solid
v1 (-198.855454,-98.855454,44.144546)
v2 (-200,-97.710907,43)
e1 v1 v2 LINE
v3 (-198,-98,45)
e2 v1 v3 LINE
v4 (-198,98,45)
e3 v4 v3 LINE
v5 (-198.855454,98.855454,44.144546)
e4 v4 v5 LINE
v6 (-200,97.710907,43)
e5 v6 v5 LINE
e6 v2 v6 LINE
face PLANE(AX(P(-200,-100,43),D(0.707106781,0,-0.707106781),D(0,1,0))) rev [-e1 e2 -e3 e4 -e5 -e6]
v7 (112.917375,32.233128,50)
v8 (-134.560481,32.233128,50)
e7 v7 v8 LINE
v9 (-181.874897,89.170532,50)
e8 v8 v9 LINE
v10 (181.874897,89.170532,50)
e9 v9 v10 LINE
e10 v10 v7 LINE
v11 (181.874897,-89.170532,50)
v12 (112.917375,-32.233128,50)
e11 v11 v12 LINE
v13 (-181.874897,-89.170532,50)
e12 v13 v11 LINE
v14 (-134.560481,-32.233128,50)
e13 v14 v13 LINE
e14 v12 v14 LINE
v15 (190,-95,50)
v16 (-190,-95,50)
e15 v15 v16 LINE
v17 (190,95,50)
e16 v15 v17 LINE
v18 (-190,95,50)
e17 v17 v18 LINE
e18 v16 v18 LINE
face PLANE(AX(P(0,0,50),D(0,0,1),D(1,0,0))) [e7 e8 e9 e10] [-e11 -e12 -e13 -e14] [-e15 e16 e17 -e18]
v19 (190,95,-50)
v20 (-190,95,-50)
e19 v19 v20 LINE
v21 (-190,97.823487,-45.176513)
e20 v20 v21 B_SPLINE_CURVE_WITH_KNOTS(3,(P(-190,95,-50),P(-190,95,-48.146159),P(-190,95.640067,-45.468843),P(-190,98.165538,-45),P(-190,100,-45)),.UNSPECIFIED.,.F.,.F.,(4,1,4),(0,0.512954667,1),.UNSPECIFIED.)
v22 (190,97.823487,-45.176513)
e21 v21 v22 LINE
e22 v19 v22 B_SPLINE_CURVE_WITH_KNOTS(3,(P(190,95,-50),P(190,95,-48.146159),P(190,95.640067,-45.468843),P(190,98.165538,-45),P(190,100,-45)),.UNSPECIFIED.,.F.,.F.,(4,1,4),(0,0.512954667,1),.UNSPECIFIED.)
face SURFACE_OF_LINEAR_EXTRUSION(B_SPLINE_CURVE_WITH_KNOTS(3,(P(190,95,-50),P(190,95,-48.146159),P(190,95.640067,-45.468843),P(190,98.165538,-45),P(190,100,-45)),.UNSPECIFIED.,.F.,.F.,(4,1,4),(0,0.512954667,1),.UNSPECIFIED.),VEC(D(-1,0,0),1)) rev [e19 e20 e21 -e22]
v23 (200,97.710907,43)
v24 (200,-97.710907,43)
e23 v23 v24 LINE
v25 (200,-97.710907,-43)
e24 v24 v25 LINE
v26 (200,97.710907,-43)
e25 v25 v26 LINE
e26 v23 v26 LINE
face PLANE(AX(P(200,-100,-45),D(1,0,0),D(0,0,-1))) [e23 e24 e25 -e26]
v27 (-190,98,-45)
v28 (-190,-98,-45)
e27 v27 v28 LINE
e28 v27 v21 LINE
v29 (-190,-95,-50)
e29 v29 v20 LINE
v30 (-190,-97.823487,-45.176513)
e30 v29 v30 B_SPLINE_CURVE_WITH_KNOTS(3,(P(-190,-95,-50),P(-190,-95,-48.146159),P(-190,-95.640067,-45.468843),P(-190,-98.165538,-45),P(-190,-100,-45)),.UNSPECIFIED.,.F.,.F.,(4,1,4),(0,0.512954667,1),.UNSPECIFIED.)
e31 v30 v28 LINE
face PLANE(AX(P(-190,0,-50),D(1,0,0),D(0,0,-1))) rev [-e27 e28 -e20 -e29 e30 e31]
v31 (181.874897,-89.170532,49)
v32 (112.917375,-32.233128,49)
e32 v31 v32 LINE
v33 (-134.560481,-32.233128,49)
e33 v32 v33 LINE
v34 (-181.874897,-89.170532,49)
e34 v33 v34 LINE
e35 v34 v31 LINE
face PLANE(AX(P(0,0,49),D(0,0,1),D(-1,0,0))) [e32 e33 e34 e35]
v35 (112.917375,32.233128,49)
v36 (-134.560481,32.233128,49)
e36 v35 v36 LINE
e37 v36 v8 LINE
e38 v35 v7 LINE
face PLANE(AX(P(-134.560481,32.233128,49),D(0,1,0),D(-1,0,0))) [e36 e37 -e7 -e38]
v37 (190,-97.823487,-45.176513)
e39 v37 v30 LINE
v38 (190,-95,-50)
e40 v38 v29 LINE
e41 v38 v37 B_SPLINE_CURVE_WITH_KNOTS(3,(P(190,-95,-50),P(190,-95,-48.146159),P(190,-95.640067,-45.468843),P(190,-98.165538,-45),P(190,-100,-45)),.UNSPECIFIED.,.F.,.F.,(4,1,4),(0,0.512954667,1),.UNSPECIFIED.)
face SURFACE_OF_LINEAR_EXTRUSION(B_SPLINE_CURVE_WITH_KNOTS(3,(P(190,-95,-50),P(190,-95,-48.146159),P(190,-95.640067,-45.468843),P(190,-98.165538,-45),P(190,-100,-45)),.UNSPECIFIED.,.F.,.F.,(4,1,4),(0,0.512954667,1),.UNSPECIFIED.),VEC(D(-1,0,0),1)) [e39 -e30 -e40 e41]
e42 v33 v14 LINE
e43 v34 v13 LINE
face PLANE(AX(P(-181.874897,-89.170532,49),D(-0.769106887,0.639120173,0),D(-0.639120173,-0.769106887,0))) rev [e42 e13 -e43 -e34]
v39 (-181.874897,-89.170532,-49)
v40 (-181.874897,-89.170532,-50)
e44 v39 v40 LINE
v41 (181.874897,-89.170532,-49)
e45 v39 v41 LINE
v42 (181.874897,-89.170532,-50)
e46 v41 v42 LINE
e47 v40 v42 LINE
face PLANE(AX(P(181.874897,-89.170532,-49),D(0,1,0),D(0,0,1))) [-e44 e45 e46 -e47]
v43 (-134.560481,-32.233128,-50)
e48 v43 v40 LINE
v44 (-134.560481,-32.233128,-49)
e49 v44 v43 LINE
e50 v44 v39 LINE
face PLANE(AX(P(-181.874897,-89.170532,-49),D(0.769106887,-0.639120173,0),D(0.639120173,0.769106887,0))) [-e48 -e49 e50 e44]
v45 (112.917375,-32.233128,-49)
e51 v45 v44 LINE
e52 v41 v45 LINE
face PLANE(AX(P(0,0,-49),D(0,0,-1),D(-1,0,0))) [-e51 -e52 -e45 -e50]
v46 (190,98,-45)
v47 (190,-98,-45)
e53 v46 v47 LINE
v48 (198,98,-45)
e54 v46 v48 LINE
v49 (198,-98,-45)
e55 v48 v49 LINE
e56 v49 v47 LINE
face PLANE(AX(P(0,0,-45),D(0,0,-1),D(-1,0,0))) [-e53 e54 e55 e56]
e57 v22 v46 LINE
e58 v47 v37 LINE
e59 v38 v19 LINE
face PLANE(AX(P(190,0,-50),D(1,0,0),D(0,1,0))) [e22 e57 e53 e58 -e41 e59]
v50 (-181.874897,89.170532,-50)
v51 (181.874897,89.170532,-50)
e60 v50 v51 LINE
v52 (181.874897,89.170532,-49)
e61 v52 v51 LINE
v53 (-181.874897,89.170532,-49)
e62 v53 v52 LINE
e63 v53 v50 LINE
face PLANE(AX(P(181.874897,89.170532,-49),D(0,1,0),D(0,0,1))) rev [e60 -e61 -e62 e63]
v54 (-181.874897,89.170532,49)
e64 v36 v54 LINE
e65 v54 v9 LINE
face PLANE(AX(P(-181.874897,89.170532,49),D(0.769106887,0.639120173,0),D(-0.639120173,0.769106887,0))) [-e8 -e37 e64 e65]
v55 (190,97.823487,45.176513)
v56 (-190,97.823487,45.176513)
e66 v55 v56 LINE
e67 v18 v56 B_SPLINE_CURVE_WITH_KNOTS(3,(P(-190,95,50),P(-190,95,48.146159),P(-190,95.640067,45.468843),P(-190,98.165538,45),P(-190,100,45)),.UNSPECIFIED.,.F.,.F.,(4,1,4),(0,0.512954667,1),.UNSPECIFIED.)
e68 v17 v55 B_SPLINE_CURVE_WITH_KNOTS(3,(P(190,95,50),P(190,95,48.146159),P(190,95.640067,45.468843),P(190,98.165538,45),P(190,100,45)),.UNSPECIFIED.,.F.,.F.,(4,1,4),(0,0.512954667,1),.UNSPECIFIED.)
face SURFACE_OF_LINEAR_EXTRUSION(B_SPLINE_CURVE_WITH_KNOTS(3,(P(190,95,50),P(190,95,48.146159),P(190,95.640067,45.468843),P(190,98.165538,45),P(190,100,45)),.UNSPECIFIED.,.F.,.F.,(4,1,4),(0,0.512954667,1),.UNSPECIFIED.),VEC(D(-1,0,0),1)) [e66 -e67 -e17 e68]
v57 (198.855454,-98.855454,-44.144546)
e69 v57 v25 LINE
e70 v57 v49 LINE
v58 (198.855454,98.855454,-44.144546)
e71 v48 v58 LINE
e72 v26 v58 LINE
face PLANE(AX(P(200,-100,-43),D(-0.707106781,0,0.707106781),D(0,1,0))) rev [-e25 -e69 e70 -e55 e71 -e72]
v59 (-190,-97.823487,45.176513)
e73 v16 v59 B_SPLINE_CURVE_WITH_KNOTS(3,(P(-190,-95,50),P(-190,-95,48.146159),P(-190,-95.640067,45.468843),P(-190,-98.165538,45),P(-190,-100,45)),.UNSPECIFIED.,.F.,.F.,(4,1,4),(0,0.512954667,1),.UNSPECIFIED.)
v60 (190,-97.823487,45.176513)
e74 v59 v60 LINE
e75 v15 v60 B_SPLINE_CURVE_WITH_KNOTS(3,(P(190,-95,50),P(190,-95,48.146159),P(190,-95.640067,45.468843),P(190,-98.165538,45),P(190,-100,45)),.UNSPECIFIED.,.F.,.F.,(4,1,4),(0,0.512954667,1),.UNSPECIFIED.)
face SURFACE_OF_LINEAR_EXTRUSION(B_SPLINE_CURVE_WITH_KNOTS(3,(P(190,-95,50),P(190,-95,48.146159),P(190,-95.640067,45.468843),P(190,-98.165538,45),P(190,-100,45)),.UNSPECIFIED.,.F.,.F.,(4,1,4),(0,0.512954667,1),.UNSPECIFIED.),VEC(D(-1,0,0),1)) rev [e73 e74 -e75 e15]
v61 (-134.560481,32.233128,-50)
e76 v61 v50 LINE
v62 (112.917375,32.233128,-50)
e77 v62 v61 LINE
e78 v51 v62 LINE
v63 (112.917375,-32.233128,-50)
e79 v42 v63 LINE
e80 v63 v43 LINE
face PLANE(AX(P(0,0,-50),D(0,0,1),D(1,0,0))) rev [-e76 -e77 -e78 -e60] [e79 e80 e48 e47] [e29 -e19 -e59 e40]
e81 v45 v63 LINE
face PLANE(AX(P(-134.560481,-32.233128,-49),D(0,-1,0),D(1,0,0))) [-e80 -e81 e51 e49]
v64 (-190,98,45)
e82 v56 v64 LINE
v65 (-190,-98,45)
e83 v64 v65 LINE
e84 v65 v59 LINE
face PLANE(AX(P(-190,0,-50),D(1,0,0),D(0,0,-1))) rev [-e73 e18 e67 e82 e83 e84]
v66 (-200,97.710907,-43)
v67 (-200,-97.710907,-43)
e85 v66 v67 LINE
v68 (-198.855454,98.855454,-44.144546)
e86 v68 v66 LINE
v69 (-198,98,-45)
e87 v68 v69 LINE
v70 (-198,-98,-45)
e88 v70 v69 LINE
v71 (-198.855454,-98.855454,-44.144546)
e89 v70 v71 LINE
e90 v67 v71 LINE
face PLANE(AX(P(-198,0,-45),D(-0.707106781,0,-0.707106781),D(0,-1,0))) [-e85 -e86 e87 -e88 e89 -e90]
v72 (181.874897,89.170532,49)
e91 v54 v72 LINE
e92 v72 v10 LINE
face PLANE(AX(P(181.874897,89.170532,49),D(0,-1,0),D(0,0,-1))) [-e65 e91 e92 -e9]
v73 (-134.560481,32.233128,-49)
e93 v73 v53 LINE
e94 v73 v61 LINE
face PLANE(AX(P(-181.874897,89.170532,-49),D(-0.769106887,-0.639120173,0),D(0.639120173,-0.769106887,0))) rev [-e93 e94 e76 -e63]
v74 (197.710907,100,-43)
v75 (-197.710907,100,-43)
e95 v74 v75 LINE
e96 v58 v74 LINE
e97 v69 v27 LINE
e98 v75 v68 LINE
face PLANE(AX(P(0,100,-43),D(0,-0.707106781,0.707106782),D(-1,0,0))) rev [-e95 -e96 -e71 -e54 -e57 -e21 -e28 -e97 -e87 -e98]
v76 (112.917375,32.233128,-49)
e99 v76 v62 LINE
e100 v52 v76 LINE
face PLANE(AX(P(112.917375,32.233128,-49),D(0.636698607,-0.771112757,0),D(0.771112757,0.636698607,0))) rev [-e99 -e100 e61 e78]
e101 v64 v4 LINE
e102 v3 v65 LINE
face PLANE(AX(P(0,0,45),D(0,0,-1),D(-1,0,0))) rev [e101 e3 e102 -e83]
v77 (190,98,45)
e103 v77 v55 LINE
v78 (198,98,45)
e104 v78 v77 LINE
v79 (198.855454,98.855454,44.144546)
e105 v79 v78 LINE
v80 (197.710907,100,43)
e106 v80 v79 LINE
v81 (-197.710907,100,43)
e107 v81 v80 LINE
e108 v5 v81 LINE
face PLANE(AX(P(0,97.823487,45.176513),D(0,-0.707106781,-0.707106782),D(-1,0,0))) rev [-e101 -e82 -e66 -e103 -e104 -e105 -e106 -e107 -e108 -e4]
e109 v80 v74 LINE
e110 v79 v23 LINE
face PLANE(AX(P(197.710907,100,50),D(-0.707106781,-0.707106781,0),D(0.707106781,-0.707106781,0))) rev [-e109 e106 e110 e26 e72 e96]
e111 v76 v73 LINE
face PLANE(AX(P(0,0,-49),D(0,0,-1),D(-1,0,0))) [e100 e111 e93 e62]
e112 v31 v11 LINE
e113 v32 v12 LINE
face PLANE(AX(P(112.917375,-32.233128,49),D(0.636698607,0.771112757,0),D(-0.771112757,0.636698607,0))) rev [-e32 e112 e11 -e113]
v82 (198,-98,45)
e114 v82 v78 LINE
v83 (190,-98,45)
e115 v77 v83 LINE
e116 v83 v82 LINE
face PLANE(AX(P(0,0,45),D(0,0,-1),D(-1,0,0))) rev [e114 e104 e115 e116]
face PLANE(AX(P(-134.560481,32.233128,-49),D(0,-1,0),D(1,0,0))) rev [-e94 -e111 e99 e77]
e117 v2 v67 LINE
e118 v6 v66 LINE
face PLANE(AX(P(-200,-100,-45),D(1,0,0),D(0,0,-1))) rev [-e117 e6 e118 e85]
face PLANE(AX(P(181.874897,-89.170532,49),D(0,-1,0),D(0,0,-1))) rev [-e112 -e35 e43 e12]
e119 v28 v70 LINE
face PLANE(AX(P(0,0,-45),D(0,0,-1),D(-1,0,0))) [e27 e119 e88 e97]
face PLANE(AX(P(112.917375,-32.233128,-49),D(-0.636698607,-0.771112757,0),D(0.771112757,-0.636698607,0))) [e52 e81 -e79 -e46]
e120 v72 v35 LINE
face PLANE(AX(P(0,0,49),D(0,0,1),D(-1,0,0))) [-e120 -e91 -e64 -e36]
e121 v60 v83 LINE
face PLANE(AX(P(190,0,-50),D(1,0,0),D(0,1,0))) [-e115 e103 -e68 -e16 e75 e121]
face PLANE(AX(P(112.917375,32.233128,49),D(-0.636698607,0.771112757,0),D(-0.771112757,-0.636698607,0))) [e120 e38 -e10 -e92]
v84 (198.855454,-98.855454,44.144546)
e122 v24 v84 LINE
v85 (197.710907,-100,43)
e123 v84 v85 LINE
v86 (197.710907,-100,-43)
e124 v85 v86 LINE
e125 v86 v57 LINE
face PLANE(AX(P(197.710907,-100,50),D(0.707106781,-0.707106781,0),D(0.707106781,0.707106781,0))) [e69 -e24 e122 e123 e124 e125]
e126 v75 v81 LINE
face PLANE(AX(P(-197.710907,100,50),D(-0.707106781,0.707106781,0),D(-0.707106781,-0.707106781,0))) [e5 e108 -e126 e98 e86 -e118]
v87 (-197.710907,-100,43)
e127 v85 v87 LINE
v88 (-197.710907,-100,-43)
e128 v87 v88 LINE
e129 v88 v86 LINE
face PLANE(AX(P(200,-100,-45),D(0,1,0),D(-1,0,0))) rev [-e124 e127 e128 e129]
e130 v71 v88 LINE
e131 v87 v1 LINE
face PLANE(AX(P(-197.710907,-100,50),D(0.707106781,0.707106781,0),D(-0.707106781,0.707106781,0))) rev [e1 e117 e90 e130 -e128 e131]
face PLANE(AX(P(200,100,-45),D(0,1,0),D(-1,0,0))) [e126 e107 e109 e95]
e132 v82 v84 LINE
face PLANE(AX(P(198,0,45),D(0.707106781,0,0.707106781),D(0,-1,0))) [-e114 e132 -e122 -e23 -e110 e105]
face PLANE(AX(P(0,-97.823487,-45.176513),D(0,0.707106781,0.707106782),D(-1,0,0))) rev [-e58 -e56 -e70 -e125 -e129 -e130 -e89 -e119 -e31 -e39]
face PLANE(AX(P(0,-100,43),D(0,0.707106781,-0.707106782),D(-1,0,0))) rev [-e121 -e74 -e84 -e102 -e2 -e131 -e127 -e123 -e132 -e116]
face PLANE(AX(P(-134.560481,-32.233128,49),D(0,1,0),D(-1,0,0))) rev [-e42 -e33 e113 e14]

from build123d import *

# Parameters (mm, degrees)
BOSS_EXTRUDE3_DEPTH      = 45
BOSS_EXTRUDE3_DEPTH_BACK = 45
SKETCH4_W                = 400
SKETCH4_H                = 200
BOSS_EXTRUDE9_DEPTH      = 50
BOSS_EXTRUDE9_DEPTH_BACK = 50
EXTRUDE_THIN1_START      = -380
EXTRUDE_THIN1_DEPTH      = 380
MIRROR6_START            = -380
MIRROR6_COPY_1_DEPTH     = 380
CUT_EXTRUDE5_DEPTH       = 243.950612345
MIRROR8_COPY_1_DEPTH     = 243.950612345
CUT_EXTRUDE6_DEPTH       = 1
CHAMFER2_SIZE            = 2
CHAMFER3_START           = -200
CHAMFER3_DEPTH           = 400
MIRROR11_COPY_1_DEPTH    = 1


with BuildPart() as part:
    # Sketch4 → Boss-Extrude3 (new, two sides: drawn at the far end of the back side and taken through both)
    with BuildSketch(Plane.XY.offset(-BOSS_EXTRUDE3_DEPTH_BACK)):
        Rectangle(SKETCH4_W, SKETCH4_H)
    extrude(amount=BOSS_EXTRUDE3_DEPTH + BOSS_EXTRUDE3_DEPTH_BACK)

    # Sketch5 → Boss-Extrude9 (add, two sides: drawn at the far end of the back side and taken through both)
    with BuildSketch(Plane.XY.offset(-BOSS_EXTRUDE9_DEPTH_BACK)):
        with BuildLine():
            ThreePointArc((2.236067977, -1.118033989), (0, -0.590169944), (-2.236067977, -1.118033989))
            Line((-2.236067977, -1.118033989), (-190, -95))
            Line((-190, -95), (-190, 95))
            Line((-190, 95), (-2.236067977, 1.118033989))
            ThreePointArc((-2.236067977, 1.118033989), (0, 0.590169944), (2.236067977, 1.118033989))
            Line((2.236067977, 1.118033989), (190, 95))
            Line((190, 95), (190, -95))
            Line((190, -95), (2.236067977, -1.118033989))
        make_face()
        with BuildLine():
            ThreePointArc((2.236067977, 1.118033989), (0, 0.590169944), (-2.236067977, 1.118033989))
            Line((-2.236067977, 1.118033989), (-190, 95))
            Line((-190, 95), (190, 95))
            Line((190, 95), (2.236067977, 1.118033989))
        make_face()
        with BuildLine():
            Line((2.236067977, -1.118033989), (190, -95))
            Line((190, -95), (-190, -95))
            Line((-190, -95), (-2.236067977, -1.118033989))
            ThreePointArc((-2.236067977, -1.118033989), (0, -0.590169944), (2.236067977, -1.118033989))
        make_face()
    extrude(amount=BOSS_EXTRUDE9_DEPTH + BOSS_EXTRUDE9_DEPTH_BACK)

    # Extrude-Thin1: read off the stored shape, not the designer's step
    # Extrude-Thin1 outline → Extrude-Thin1 (add)
    with BuildSketch(Plane.ZY.offset(190).offset(EXTRUDE_THIN1_START)):
        with BuildLine():
            add(Edge.make_bspline(
                [(-50, 95), (-48.146158838, 95), (-45.468843049, 95.640067172), (-45, 98.16553813), (-45, 100)],
                knots=[0, 0, 0, 0, 0.512954667, 1, 1, 1, 1], degree=3))
            Line((-50, 95), (-45, 95))
            Line((-45, 95), (-45, 100))
        make_face()
    extrude_thin1 = extrude(amount=EXTRUDE_THIN1_DEPTH)

    # Mirror5: Extrude-Thin1 across plane
    add(extrude_thin1.mirror(Plane.ZX))

    # Mirror6: Extrude-Thin1 across plane
    add(extrude_thin1.mirror(Plane.XY))

    # Mirror6 copy 1 sketch → Mirror6 copy 1 (add)
    with BuildSketch(Plane(origin=(-190, 0, 0), x_dir=(0, 0, -1), z_dir=(-1, 0, 0)).offset(MIRROR6_START)):
        with BuildLine():
            add(Edge.make_bspline(
                [(-50, 95), (-48.146158838, 95), (-45.468843049, 95.640067172), (-45, 98.16553813), (-45, 100)],
                knots=[0, 0, 0, 0, 0.512954667, 1, 1, 1, 1], degree=3))
            Line((-50, 95), (-45, 95))
            Line((-45, 95), (-45, 100))
        make_face()
    extrude(amount=MIRROR6_COPY_1_DEPTH)

    # Sketch11 → Cut-Extrude5 (cut, through all)
    with BuildSketch(Plane(origin=(0, 0, -45), x_dir=(-1, 0, 0), z_dir=(0, 0, -1))):
        Polygon((-197.710907072, 100), (-200, 97.710907072), (-200, 100), align=None)
    cut_extrude5 = extrude(amount=-CUT_EXTRUDE5_DEPTH, mode=Mode.SUBTRACT)

    # Mirror7: Cut-Extrude5 across plane
    add(cut_extrude5.mirror(Plane.ZX), mode=Mode.SUBTRACT)

    # Mirror8: Cut-Extrude5 across plane
    add(cut_extrude5.mirror(Plane(origin=(0, 0, 0), x_dir=(0, 0, 1), z_dir=(1, 0, 0))), mode=Mode.SUBTRACT)

    # Mirror8 copy 1 sketch → Mirror8 copy 1 (cut, through all)
    with BuildSketch(Plane(origin=(0, 0, -45), x_dir=(1, 0, 0), z_dir=(0, 0, -1))):
        Polygon((-197.710907072, 100), (-200, 97.710907072), (-200, 100), align=None)
    extrude(amount=-MIRROR8_COPY_1_DEPTH, mode=Mode.SUBTRACT)

    # Sketch12 → Cut-Extrude6 (cut)
    with BuildSketch(Plane(origin=(0, 0, -50), x_dir=(-1, 0, 0), z_dir=(0, 0, -1))):
        Polygon((-181.874897075, 89.170531546), (181.874897075, 89.170531546), (134.560480933, 32.233127844), (-112.917374812, 32.233127844), align=None)
    cut_extrude6 = extrude(amount=-CUT_EXTRUDE6_DEPTH, mode=Mode.SUBTRACT)

    # Mirror9: Cut-Extrude6 across plane
    add(cut_extrude6.mirror(Plane.ZX), mode=Mode.SUBTRACT)

    # Chamfer2
    chamfer2_edges = [part.edges().sort_by_distance(p)[0] for p in [
        (200, 0, 45),
        (200, 0, -45),
        (-200, 0, -45),
        (-200, 0, 45),
    ]]
    chamfer(chamfer2_edges, length=CHAMFER2_SIZE)

    # Chamfer3: read off the stored shape, not the designer's step
    # Chamfer3 outline → Chamfer3 (cut)
    with BuildSketch(Plane.YZ.offset(CHAMFER3_START)):
        with BuildLine():
            Line((-100, 45), (-100, 43))
            Line((-100, 43), (-97.823486796, 45.176513202))
            add(Edge.make_bspline(
                [(-97.823486796, 45.176513202), (-98.429622739, 45.049035026), (-99.14991283, 45), (-100, 45)],
                knots=[0.774303846, 0.774303846, 0.774303846, 0.774303846, 1, 1, 1, 1], degree=3))
        make_face()
        with BuildLine():
            Line((-100, -43), (-100, -45))
            add(Edge.make_bspline(
                [(-97.823486796, -45.176513202), (-98.429622739, -45.049035026), (-99.14991283, -45), (-100, -45)],
                knots=[0.774303846, 0.774303846, 0.774303846, 0.774303846, 1, 1, 1, 1], degree=3))
            Line((-97.823486796, -45.176513202), (-100, -43))
        make_face()
        with BuildLine():
            Line((100, 43), (100, 45))
            add(Edge.make_bspline(
                [(97.823486796, 45.176513202), (98.429622739, 45.049035026), (99.14991283, 45), (100, 45)],
                knots=[0.774303846, 0.774303846, 0.774303846, 0.774303846, 1, 1, 1, 1], degree=3))
            Line((97.823486796, 45.176513202), (100, 43))
        make_face()
        with BuildLine():
            add(Edge.make_bspline(
                [(97.823486796, -45.176513202), (98.429622739, -45.049035026), (99.14991283, -45), (100, -45)],
                knots=[0.774303846, 0.774303846, 0.774303846, 0.774303846, 1, 1, 1, 1], degree=3))
            Line((100, -45), (100, -43))
            Line((100, -43), (97.823486796, -45.176513202))
        make_face()
    extrude(amount=CHAMFER3_DEPTH, mode=Mode.SUBTRACT)

    # Mirror11: Cut-Extrude6 across plane
    add(cut_extrude6.mirror(Plane.XY), mode=Mode.SUBTRACT)

    # Mirror11 copy 1 sketch → Mirror11 copy 1 (cut)
    with BuildSketch(Plane(origin=(0, 0, 50), x_dir=(-1, 0, 0), z_dir=(0, 0, 1))):
        Polygon((-181.874897075, 89.170531546), (181.874897075, 89.170531546), (134.560480933, 32.233127844), (-112.917374812, 32.233127844), align=None)
    extrude(amount=-MIRROR11_COPY_1_DEPTH, mode=Mode.SUBTRACT)


solid = part.part
